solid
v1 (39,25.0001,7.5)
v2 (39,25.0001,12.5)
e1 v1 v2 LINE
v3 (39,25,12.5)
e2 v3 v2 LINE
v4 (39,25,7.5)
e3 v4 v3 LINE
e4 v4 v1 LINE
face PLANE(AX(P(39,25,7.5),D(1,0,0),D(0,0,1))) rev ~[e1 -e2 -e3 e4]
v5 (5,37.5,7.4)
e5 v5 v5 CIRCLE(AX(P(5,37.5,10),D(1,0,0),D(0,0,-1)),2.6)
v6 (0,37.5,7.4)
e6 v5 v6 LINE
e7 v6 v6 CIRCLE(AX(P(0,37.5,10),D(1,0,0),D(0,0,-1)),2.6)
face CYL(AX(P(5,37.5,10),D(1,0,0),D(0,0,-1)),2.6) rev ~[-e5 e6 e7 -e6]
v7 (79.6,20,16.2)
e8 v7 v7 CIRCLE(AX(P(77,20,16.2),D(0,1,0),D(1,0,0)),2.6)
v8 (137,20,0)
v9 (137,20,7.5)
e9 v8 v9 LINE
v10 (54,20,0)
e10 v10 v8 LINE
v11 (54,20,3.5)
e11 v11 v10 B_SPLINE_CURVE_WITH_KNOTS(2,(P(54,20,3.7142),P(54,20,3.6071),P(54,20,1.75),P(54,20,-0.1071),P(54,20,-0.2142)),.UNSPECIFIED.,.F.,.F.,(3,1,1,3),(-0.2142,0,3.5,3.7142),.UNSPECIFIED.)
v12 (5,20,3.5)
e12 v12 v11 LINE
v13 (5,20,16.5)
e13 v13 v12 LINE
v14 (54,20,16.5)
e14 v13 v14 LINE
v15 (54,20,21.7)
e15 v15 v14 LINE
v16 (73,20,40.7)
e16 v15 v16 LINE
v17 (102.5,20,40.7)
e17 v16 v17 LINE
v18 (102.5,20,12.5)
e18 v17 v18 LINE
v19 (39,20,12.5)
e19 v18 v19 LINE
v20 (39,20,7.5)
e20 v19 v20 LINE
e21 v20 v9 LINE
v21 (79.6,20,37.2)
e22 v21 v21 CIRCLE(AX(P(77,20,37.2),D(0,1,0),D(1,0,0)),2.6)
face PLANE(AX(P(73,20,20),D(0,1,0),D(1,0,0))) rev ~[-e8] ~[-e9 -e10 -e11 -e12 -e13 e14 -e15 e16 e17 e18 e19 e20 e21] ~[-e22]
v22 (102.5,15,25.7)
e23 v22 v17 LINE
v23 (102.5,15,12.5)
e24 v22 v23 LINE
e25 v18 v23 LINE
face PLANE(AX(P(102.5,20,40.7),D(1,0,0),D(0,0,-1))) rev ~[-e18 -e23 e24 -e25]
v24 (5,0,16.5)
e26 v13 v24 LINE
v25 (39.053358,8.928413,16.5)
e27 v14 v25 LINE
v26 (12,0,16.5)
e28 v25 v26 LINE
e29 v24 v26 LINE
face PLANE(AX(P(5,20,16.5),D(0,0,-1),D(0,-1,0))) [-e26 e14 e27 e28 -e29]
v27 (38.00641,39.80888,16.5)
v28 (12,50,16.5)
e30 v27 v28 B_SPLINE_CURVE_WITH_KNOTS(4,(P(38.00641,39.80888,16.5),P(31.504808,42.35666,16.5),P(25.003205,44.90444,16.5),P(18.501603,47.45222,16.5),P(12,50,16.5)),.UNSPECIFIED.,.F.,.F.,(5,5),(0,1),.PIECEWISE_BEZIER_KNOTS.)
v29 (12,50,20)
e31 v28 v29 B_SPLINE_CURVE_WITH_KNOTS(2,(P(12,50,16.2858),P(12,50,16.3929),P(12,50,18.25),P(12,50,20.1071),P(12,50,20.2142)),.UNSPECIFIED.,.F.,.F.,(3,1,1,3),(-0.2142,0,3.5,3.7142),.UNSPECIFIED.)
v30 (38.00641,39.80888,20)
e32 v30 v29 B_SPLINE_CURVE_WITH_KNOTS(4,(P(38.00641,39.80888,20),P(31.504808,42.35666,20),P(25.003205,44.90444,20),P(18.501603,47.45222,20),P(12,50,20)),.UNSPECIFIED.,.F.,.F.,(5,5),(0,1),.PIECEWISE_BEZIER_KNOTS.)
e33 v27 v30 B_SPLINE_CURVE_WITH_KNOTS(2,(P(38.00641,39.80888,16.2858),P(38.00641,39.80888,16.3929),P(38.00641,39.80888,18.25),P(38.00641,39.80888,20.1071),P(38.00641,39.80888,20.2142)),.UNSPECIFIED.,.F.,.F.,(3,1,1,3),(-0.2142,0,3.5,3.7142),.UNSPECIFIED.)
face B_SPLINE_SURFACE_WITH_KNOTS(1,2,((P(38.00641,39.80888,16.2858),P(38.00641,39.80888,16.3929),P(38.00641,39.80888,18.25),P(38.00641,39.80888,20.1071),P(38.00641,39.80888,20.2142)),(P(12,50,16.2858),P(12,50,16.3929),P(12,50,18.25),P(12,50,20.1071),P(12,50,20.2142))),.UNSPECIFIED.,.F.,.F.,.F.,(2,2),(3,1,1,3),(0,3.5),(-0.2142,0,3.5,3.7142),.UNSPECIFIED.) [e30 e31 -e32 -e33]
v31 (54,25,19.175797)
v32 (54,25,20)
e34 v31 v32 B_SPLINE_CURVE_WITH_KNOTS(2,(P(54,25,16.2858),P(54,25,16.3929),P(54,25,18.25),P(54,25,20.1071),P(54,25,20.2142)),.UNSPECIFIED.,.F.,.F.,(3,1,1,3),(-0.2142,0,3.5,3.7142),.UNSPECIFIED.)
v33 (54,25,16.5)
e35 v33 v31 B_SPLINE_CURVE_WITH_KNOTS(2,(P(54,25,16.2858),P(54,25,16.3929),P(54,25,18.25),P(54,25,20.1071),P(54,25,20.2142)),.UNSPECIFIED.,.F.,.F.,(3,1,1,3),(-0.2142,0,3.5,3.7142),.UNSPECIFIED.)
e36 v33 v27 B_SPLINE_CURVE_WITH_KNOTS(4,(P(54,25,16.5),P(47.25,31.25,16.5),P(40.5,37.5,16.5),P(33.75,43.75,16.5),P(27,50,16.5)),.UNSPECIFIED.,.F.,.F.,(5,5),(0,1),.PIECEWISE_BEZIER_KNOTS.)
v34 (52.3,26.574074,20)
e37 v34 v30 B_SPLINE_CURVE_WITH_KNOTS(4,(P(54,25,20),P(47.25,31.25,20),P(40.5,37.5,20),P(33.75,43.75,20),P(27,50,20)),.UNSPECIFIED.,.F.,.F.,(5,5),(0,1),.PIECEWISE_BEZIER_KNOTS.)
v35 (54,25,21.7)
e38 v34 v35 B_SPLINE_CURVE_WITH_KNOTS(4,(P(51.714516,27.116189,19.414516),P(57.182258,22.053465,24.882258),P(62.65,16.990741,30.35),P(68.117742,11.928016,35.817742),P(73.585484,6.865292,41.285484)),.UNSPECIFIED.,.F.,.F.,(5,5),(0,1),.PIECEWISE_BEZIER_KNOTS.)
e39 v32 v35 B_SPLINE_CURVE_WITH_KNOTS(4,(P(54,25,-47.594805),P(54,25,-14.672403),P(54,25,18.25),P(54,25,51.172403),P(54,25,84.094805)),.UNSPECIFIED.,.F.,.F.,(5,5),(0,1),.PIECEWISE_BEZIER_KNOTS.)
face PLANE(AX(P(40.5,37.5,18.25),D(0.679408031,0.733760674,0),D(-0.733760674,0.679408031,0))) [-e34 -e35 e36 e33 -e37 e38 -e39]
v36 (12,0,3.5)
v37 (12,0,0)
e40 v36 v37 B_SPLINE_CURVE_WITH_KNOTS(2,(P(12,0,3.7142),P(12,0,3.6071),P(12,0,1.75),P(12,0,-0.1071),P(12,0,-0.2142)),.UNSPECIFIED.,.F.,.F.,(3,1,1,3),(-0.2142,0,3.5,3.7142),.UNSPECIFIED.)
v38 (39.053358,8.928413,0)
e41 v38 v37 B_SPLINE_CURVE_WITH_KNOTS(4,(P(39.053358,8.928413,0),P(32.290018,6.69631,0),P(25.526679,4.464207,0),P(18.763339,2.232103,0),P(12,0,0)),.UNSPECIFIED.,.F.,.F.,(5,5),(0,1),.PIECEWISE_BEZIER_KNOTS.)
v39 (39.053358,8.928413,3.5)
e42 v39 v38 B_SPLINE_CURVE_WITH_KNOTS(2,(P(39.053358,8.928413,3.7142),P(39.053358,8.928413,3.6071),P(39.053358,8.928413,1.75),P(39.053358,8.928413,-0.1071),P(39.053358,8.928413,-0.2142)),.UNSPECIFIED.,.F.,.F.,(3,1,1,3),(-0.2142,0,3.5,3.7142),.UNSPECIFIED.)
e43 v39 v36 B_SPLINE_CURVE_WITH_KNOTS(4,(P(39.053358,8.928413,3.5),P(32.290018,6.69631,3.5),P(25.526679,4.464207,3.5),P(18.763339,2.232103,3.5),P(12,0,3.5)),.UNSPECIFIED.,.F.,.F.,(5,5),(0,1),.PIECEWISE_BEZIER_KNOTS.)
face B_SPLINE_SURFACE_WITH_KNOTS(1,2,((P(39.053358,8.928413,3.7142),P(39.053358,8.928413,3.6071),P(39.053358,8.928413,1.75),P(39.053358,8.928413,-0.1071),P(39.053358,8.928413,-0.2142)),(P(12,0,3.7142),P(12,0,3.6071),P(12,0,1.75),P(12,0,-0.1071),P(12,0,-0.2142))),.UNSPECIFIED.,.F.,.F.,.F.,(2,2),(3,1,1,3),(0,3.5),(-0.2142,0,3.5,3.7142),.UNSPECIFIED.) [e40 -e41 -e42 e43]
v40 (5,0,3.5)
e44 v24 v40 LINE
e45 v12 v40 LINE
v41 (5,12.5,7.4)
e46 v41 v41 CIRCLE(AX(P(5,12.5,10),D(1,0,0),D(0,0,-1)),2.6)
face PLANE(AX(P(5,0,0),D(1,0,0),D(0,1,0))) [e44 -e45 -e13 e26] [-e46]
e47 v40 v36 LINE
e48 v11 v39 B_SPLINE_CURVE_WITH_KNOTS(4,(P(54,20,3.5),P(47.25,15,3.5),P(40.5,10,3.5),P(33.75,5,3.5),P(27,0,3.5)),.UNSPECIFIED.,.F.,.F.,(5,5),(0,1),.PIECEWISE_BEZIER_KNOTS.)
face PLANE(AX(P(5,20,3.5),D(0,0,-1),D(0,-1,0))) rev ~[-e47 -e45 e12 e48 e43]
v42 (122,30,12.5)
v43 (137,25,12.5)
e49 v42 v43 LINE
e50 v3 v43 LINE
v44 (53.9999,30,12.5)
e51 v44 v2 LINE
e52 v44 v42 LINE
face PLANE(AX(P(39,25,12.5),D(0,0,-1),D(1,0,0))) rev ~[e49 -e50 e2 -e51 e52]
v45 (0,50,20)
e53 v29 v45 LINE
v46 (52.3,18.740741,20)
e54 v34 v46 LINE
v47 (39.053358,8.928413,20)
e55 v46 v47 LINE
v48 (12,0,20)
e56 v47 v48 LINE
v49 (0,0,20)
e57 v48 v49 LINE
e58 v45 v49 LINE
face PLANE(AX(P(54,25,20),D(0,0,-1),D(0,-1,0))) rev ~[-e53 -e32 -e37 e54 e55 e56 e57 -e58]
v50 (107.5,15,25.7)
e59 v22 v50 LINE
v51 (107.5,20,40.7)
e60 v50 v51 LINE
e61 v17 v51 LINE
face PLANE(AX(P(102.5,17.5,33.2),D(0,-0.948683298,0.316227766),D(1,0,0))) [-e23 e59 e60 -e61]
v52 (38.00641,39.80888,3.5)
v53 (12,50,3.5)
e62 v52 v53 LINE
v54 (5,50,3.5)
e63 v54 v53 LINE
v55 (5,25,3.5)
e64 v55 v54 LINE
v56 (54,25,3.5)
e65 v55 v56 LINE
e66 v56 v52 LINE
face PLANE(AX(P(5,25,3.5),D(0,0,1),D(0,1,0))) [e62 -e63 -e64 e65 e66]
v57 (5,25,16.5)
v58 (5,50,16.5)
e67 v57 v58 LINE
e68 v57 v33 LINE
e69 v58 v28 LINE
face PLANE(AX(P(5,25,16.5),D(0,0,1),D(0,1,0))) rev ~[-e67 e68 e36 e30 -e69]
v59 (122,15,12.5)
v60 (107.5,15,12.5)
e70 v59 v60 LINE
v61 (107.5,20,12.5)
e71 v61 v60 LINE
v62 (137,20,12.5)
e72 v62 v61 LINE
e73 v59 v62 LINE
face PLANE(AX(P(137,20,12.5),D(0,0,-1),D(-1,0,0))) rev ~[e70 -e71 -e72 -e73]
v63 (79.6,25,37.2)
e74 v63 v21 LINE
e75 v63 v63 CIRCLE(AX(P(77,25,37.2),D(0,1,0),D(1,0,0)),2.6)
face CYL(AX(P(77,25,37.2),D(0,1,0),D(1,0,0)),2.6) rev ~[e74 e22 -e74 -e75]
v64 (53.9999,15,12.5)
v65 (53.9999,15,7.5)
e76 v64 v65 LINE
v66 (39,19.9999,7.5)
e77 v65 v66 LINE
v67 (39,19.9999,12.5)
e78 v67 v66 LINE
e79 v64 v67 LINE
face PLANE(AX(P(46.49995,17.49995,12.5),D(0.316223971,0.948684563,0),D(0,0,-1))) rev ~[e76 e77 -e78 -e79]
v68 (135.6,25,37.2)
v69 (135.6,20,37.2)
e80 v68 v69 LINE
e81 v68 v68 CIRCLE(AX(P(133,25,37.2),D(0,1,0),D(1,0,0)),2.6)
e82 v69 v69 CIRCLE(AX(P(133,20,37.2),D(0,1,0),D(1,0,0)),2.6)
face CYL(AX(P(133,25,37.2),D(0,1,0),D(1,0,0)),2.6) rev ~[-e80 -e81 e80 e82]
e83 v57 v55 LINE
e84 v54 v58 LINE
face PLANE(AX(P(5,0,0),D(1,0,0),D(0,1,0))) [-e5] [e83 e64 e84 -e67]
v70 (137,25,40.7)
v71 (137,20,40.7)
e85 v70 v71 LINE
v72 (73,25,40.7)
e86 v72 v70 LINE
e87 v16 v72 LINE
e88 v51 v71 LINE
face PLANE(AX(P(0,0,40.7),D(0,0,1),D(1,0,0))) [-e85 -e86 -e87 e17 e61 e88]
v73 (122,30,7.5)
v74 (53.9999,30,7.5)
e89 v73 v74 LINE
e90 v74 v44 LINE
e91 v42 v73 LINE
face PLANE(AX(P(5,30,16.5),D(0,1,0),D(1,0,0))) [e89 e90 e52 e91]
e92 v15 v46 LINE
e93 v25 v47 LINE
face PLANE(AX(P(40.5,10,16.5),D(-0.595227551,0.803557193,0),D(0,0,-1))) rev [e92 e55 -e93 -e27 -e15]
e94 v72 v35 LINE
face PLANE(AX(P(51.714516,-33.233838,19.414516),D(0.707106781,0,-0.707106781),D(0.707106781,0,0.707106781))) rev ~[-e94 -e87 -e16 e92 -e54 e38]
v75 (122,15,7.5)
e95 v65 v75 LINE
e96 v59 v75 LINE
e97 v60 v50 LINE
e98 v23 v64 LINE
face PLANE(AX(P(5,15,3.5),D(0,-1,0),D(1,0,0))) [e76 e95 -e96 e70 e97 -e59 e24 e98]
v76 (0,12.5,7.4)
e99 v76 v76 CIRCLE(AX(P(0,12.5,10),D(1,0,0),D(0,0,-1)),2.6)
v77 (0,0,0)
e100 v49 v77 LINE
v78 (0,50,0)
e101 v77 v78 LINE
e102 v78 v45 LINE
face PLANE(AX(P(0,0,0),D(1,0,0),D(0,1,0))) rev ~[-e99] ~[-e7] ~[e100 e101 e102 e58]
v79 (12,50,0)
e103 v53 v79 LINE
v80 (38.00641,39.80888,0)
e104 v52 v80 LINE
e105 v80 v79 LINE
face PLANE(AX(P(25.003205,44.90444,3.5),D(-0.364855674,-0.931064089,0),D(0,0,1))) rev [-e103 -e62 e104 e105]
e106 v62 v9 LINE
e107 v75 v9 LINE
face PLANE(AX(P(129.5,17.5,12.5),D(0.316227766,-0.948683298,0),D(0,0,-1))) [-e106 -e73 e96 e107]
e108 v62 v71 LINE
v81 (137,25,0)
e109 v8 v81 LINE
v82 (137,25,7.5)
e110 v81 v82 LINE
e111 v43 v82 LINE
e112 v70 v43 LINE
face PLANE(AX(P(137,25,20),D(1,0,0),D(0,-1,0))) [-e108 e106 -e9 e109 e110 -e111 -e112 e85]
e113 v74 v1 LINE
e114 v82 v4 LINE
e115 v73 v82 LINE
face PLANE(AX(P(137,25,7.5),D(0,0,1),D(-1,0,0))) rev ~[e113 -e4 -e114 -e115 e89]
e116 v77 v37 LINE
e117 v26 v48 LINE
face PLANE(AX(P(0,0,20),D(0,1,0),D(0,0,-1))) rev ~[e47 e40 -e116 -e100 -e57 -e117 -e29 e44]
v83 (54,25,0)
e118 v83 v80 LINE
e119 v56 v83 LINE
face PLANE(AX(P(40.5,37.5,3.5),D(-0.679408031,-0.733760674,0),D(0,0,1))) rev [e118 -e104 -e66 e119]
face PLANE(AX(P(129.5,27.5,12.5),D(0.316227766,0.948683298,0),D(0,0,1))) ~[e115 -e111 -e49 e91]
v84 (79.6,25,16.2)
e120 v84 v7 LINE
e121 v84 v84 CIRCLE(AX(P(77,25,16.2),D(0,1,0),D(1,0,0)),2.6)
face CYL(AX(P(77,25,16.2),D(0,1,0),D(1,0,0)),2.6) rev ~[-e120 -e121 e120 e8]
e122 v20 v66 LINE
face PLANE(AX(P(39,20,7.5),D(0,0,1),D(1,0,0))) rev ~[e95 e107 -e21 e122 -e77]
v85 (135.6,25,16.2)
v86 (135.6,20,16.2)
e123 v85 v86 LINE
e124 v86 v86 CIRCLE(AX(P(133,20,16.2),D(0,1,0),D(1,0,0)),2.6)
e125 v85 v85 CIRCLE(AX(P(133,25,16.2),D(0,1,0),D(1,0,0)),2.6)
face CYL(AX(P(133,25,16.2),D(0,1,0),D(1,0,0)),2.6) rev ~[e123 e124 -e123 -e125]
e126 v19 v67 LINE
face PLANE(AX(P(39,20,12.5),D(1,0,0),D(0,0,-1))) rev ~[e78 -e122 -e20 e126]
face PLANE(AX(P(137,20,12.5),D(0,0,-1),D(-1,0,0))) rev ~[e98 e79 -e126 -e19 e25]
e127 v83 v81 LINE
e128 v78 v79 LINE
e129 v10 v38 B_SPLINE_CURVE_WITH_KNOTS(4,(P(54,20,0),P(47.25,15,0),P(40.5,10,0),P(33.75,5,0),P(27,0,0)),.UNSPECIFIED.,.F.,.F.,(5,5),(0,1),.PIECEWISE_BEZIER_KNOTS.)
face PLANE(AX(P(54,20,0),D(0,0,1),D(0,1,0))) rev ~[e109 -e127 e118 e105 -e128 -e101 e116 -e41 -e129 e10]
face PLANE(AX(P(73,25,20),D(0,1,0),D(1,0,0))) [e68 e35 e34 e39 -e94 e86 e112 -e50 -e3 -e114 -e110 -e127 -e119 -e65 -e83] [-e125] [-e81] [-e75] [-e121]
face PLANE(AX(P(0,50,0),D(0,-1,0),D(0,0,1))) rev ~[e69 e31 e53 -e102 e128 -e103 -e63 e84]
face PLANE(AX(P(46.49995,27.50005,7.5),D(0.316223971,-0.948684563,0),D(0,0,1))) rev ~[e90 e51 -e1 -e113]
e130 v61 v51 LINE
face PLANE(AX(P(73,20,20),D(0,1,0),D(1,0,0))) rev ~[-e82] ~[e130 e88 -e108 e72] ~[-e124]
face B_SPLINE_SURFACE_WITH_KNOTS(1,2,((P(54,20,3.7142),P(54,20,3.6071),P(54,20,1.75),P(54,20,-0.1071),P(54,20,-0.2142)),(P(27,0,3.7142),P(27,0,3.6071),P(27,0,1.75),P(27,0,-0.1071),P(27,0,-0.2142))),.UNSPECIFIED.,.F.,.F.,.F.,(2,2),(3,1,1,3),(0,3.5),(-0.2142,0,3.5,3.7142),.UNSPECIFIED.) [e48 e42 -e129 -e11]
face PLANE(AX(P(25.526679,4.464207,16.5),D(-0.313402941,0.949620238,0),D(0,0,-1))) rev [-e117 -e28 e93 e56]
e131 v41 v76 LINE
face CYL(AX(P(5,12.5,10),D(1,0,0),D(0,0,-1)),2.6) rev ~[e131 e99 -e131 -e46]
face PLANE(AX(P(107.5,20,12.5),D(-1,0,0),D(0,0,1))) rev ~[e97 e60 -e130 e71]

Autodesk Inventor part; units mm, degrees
ref_plane "YZ Plane" through (0, 0, 0) normal (1, 0, 0) x (0, 1, 0)
ref_plane "XZ Plane" through (0, 0, 0) normal (0, 1, 0) x (-1, 0, 0)
ref_plane "XY Plane" through (0, 0, 0) normal (0, 0, 1) x (1, 0, 0)
sketch "Sketch1" plane through (0, 0, 0) normal (1, 0, 0) x (0, 1, 0)
  line L0 (0, 0) -> (50, 0)
  line L1 (50, 0) -> (50, 20)
  line L2 (50, 20) -> (0, 20)
  line L3 (0, 20) -> (0, 0)
  dimension "d0" = 50
  dimension "d1" = 20
extrude "Extrusion1" add sketch "Sketch1" along normal blind 5
sketch "Sketch2" plane through (5, 0, 0) normal (1, 0, 0) x (0, 0, -1)
  line L0 (-20, 50) -> (-20, 0) projected
  line L1 (-20, 25) -> (0, 25)
  line L2 (0, 0) -> (0, 50) projected
  line L3 (-20, 20) -> (0, 20)
  line L4 (0, 50) -> (-20, 50) construction
  line L5 (-10, 50) -> (-10, 0) construction
  line L6 (-20, 0) -> (0, 0) construction
  circle A0 centre (-10, 37.5) radius 2.6
  circle A1 centre (-10, 12.5) radius 2.6
  circle A2 centre (-10, 37.5) radius 4.625 construction
  circle A3 centre (-10, 12.5) radius 4.625 construction
  line L7 (-20, 25) -> (-16.5, 25)
  line L8 (-16.5, 25) -> (-16.5, 50)
  line L9 (-16.5, 50) -> (-20, 50)
  line L10 (-20, 50) -> (-20, 25)
  line L11 (0, 25) -> (-3.5, 25)
  line L12 (-3.5, 25) -> (-3.5, 50)
  line L13 (-3.5, 50) -> (0, 50)
  line L14 (0, 50) -> (0, 25)
  line L15 (-20, 20) -> (-16.5, 20)
  line L16 (-16.5, 20) -> (-16.5, 0)
  line L17 (-16.5, 0) -> (-20, 0)
  line L18 (-20, 0) -> (-20, 20)
  line L19 (0, 20) -> (-3.5, 20)
  line L20 (-3.5, 20) -> (-3.5, 0)
  line L21 (-3.5, 0) -> (0, 0)
  line L22 (0, 0) -> (0, 20)
  dimension "d4" = 5
  dimension "d5" = 5.2
  dimension "d6" = 5.2
  dimension "d7" = 12.5
  dimension "d8" = 12.5
  dimension "d9" = 9.25
  dimension "d10" = 9.25
  dimension "d11" = 3.5
  dimension "d12" = 3.5
  dimension "d13" = 3.5
  dimension "d14" = 3.5
extrude "Extrusion2" add sketch "Sketch2" along normal blind 49 contours L9 L8 L1 L0 | L1 L2 L3 L0 | L3 L16 L17 L0 | L12 L13 L2 L1 | L3 L2 L21 L20
chamfer "Chamfer1" distance 25 distance2 27 1 edges at (54, 50, 1.75) measured on face at (54, 23.3333, 18.8333)
chamfer "Chamfer2" distance 25 distance2 27 1 edges at (54, 50, 18.25) measured on face at (54, 23.3333, 18.8333)
chamfer "Chamfer3" distance 20 distance2 27 1 edges at (54, 0, 18.25) measured on face at (54, 15, 18.8333)
chamfer "Chamfer4" distance 20 distance2 27 1 edges at (54, 0, 1.75) measured on face at (54, 15, 1.1667)
sketch "Sketch3" plane through (54, 0, 0) normal (1, 0, 0) x (0, 0, -1)
  line L0 (0, 20) -> (-3.5, 20) projected
  line L1 (0, 20) -> (0, 25) projected
  line L2 (-3.5, 25) -> (0, 25) projected
  line L3 (-3.5, 25) -> (-16.5, 25) projected
  line L4 (-20, 25) -> (-16.5, 25) projected
  line L5 (-20, 25) -> (-20, 20) projected
  line L6 (-16.5, 20) -> (-20, 20) projected
  line L7 (-16.5, 20) -> (-3.5, 20) projected
  point P0 (0, 0)
extrude "Extrusion3" add sketch "Sketch3" along normal blind 83
sketch "Sketch4" plane through (5, 25, 16.5) normal (0, 1, 0) x (1, 0, 0)
  line L0 (132, -3.5) -> (132, 16.5) projected
  line L1 (132, 9) -> (34, 9)
  line L2 (34, 9) -> (34, 4)
  line L3 (34, 4) -> (132, 4)
  line L4 (132, 4) -> (132, 9)
  line L5 (49, 16.5) -> (132, 16.5) projected
  point P0 (-5, 16.5)
  dimension "d31" = 98
  dimension "d32" = 5
  dimension "d33" = 7.5
extrude "Extrusion4" add sketch "Sketch4" along normal blind 5
sketch "Sketch5" plane through (5, 20, 3.5) normal (0, -1, 0) x (1, 0, 0)
  line L0 (34, 9) -> (34, 4) projected
  line L1 (132, 9) -> (34, 9) projected
  line L2 (34, 4) -> (132, 4) projected
  line L3 (132, 16.5) -> (132, -3.5) projected
  point P0 (-5, -3.5)
extrude "Extrusion5" add sketch "Sketch5" along normal blind 5
chamfer "Chamfer5" distance 15 distance2 5 1 edges at (137, 30, 10) measured on face at (104.3333, 30, 10.8333)
chamfer "Chamfer6" distance 15 distance2 5 1 edges at (39, 30, 10) measured on face at (94.3333, 30, 10.8333)
chamfer "Chamfer7" distance 15 distance2 5 1 edges at (137, 15, 10) measured on face at (104.3333, 15, 9.1667)
chamfer "Chamfer8" distance 15 distance2 5 1 edges at (39, 15, 10) measured on face at (94.3333, 15, 9.1667)
sketch "Sketch6" plane through (5, 0, 0) normal (1, 0, 0) x (0, 0, -1)
  line L0 (-3.5, 50) -> (-16.5, 50) construction
  line L1 (-10, 50) -> (-10, 0) construction
  line L2 (-20, 0) -> (0, 0) construction
  circle A0 centre (-10, 37.5) radius 2.6
  circle A1 centre (-10, 12.5) radius 2.6
  dimension "d50" = 5.2
  dimension "d51" = 5.2
  dimension "d52" = 12.5
  dimension "d53" = 12.5
extrude "Extrusion6" cut sketch "Sketch6" against normal up to next
sketch "Sketch7" plane through (0, 0, 20) normal (0, 0, 1) x (1, 0, 0)
  line L0 (39, 20) -> (137, 20) projected
  line L1 (39, 25) -> (137, 25) projected
  line L2 (137, 20) -> (73, 20)
  line L3 (73, 20) -> (73, 25)
  line L4 (73, 25) -> (137, 25)
  line L5 (137, 25) -> (137, 20)
  point P0 (0, 0)
  point P1 (73, 20)
  dimension "d56" = 64
extrude "Extrusion7" add sketch "Sketch7" along normal blind 20.7
sketch "Sketch8" plane through (5, 25, 16.5) normal (0, 1, 0) x (1, 0, 0)
  line L0 (68, -3.5) -> (68, -24.2) projected
  line L1 (68, -24.2) -> (132, -24.2)
  line L2 (132, -24.2) -> (132, 3.8)
  line L3 (132, 3.8) -> (68, 3.8)
  line L4 (68, 3.8) -> (68, -24.2)
  line L5 (72, -20.7) -> (128, -20.7) construction
  line L6 (128, -20.7) -> (128, 0.3) construction
  line L7 (128, 0.3) -> (72, 0.3) construction
  line L8 (72, 0.3) -> (72, -20.7) construction
  circle A0 centre (72, -20.7) radius 2.6
  circle A1 centre (72, 0.3) radius 2.6
  circle A2 centre (128, -20.7) radius 2.6
  circle A3 centre (128, 0.3) radius 2.6
  point P0 (-5, 16.5)
  dimension "d59" = 64
  dimension "d60" = 28
  dimension "d61" = 56
  dimension "d62" = 21
  dimension "d63" = 3.5
  dimension "d64" = 4
  dimension "d65" = 5.2
  dimension "d66" = 5.2
  dimension "d67" = 5.2
  dimension "d68" = 5.2
extrude "Extrusion8" cut sketch "Sketch8" against normal up to next contours A0 | A1 | A2 | A3
sketch "Sketch9" plane through (5, 20, 3.5) normal (0, -1, 0) x (1, 0, 0)
  line L0 (68, 37.2) -> (132, 37.2) projected
  line L1 (117, 9) -> (49, 9) projected
  line L2 (102.5, 37.2) -> (97.5, 37.2)
  line L3 (97.5, 37.2) -> (97.5, 9)
  line L4 (97.5, 9) -> (102.5, 9)
  line L5 (102.5, 9) -> (102.5, 37.2)
  line L6 (132, 9) -> (132, 37.2) projected
  point P0 (-5, -3.5)
  point P1 (102.5, 9)
  dimension "d71" = 5
  dimension "d72" = 29.5
extrude "Extrusion9" add sketch "Sketch9" along normal blind 5
chamfer "Chamfer9" distance 15 distance2 5 1 edges at (105, 15, 40.7) measured on face at (92.8333, 15, 9.1667)
chamfer "Chamfer10" distance 15 angle 45 4 edges at (27, 50, 18.25) (27, 50, 1.75) (27, 0, 1.75) (27, 0, 18.25)
chamfer "Chamfer11" distance 20.7 angle 45 1 edges at (73, 22.5, 20)
equation "\"d8\" = d7"
equation "\"d10\" = d9"
equation "\"d53\" = d52"
equation "\"d54\" = d51"
properties part number "Y Axis Limit Switch Mount"
